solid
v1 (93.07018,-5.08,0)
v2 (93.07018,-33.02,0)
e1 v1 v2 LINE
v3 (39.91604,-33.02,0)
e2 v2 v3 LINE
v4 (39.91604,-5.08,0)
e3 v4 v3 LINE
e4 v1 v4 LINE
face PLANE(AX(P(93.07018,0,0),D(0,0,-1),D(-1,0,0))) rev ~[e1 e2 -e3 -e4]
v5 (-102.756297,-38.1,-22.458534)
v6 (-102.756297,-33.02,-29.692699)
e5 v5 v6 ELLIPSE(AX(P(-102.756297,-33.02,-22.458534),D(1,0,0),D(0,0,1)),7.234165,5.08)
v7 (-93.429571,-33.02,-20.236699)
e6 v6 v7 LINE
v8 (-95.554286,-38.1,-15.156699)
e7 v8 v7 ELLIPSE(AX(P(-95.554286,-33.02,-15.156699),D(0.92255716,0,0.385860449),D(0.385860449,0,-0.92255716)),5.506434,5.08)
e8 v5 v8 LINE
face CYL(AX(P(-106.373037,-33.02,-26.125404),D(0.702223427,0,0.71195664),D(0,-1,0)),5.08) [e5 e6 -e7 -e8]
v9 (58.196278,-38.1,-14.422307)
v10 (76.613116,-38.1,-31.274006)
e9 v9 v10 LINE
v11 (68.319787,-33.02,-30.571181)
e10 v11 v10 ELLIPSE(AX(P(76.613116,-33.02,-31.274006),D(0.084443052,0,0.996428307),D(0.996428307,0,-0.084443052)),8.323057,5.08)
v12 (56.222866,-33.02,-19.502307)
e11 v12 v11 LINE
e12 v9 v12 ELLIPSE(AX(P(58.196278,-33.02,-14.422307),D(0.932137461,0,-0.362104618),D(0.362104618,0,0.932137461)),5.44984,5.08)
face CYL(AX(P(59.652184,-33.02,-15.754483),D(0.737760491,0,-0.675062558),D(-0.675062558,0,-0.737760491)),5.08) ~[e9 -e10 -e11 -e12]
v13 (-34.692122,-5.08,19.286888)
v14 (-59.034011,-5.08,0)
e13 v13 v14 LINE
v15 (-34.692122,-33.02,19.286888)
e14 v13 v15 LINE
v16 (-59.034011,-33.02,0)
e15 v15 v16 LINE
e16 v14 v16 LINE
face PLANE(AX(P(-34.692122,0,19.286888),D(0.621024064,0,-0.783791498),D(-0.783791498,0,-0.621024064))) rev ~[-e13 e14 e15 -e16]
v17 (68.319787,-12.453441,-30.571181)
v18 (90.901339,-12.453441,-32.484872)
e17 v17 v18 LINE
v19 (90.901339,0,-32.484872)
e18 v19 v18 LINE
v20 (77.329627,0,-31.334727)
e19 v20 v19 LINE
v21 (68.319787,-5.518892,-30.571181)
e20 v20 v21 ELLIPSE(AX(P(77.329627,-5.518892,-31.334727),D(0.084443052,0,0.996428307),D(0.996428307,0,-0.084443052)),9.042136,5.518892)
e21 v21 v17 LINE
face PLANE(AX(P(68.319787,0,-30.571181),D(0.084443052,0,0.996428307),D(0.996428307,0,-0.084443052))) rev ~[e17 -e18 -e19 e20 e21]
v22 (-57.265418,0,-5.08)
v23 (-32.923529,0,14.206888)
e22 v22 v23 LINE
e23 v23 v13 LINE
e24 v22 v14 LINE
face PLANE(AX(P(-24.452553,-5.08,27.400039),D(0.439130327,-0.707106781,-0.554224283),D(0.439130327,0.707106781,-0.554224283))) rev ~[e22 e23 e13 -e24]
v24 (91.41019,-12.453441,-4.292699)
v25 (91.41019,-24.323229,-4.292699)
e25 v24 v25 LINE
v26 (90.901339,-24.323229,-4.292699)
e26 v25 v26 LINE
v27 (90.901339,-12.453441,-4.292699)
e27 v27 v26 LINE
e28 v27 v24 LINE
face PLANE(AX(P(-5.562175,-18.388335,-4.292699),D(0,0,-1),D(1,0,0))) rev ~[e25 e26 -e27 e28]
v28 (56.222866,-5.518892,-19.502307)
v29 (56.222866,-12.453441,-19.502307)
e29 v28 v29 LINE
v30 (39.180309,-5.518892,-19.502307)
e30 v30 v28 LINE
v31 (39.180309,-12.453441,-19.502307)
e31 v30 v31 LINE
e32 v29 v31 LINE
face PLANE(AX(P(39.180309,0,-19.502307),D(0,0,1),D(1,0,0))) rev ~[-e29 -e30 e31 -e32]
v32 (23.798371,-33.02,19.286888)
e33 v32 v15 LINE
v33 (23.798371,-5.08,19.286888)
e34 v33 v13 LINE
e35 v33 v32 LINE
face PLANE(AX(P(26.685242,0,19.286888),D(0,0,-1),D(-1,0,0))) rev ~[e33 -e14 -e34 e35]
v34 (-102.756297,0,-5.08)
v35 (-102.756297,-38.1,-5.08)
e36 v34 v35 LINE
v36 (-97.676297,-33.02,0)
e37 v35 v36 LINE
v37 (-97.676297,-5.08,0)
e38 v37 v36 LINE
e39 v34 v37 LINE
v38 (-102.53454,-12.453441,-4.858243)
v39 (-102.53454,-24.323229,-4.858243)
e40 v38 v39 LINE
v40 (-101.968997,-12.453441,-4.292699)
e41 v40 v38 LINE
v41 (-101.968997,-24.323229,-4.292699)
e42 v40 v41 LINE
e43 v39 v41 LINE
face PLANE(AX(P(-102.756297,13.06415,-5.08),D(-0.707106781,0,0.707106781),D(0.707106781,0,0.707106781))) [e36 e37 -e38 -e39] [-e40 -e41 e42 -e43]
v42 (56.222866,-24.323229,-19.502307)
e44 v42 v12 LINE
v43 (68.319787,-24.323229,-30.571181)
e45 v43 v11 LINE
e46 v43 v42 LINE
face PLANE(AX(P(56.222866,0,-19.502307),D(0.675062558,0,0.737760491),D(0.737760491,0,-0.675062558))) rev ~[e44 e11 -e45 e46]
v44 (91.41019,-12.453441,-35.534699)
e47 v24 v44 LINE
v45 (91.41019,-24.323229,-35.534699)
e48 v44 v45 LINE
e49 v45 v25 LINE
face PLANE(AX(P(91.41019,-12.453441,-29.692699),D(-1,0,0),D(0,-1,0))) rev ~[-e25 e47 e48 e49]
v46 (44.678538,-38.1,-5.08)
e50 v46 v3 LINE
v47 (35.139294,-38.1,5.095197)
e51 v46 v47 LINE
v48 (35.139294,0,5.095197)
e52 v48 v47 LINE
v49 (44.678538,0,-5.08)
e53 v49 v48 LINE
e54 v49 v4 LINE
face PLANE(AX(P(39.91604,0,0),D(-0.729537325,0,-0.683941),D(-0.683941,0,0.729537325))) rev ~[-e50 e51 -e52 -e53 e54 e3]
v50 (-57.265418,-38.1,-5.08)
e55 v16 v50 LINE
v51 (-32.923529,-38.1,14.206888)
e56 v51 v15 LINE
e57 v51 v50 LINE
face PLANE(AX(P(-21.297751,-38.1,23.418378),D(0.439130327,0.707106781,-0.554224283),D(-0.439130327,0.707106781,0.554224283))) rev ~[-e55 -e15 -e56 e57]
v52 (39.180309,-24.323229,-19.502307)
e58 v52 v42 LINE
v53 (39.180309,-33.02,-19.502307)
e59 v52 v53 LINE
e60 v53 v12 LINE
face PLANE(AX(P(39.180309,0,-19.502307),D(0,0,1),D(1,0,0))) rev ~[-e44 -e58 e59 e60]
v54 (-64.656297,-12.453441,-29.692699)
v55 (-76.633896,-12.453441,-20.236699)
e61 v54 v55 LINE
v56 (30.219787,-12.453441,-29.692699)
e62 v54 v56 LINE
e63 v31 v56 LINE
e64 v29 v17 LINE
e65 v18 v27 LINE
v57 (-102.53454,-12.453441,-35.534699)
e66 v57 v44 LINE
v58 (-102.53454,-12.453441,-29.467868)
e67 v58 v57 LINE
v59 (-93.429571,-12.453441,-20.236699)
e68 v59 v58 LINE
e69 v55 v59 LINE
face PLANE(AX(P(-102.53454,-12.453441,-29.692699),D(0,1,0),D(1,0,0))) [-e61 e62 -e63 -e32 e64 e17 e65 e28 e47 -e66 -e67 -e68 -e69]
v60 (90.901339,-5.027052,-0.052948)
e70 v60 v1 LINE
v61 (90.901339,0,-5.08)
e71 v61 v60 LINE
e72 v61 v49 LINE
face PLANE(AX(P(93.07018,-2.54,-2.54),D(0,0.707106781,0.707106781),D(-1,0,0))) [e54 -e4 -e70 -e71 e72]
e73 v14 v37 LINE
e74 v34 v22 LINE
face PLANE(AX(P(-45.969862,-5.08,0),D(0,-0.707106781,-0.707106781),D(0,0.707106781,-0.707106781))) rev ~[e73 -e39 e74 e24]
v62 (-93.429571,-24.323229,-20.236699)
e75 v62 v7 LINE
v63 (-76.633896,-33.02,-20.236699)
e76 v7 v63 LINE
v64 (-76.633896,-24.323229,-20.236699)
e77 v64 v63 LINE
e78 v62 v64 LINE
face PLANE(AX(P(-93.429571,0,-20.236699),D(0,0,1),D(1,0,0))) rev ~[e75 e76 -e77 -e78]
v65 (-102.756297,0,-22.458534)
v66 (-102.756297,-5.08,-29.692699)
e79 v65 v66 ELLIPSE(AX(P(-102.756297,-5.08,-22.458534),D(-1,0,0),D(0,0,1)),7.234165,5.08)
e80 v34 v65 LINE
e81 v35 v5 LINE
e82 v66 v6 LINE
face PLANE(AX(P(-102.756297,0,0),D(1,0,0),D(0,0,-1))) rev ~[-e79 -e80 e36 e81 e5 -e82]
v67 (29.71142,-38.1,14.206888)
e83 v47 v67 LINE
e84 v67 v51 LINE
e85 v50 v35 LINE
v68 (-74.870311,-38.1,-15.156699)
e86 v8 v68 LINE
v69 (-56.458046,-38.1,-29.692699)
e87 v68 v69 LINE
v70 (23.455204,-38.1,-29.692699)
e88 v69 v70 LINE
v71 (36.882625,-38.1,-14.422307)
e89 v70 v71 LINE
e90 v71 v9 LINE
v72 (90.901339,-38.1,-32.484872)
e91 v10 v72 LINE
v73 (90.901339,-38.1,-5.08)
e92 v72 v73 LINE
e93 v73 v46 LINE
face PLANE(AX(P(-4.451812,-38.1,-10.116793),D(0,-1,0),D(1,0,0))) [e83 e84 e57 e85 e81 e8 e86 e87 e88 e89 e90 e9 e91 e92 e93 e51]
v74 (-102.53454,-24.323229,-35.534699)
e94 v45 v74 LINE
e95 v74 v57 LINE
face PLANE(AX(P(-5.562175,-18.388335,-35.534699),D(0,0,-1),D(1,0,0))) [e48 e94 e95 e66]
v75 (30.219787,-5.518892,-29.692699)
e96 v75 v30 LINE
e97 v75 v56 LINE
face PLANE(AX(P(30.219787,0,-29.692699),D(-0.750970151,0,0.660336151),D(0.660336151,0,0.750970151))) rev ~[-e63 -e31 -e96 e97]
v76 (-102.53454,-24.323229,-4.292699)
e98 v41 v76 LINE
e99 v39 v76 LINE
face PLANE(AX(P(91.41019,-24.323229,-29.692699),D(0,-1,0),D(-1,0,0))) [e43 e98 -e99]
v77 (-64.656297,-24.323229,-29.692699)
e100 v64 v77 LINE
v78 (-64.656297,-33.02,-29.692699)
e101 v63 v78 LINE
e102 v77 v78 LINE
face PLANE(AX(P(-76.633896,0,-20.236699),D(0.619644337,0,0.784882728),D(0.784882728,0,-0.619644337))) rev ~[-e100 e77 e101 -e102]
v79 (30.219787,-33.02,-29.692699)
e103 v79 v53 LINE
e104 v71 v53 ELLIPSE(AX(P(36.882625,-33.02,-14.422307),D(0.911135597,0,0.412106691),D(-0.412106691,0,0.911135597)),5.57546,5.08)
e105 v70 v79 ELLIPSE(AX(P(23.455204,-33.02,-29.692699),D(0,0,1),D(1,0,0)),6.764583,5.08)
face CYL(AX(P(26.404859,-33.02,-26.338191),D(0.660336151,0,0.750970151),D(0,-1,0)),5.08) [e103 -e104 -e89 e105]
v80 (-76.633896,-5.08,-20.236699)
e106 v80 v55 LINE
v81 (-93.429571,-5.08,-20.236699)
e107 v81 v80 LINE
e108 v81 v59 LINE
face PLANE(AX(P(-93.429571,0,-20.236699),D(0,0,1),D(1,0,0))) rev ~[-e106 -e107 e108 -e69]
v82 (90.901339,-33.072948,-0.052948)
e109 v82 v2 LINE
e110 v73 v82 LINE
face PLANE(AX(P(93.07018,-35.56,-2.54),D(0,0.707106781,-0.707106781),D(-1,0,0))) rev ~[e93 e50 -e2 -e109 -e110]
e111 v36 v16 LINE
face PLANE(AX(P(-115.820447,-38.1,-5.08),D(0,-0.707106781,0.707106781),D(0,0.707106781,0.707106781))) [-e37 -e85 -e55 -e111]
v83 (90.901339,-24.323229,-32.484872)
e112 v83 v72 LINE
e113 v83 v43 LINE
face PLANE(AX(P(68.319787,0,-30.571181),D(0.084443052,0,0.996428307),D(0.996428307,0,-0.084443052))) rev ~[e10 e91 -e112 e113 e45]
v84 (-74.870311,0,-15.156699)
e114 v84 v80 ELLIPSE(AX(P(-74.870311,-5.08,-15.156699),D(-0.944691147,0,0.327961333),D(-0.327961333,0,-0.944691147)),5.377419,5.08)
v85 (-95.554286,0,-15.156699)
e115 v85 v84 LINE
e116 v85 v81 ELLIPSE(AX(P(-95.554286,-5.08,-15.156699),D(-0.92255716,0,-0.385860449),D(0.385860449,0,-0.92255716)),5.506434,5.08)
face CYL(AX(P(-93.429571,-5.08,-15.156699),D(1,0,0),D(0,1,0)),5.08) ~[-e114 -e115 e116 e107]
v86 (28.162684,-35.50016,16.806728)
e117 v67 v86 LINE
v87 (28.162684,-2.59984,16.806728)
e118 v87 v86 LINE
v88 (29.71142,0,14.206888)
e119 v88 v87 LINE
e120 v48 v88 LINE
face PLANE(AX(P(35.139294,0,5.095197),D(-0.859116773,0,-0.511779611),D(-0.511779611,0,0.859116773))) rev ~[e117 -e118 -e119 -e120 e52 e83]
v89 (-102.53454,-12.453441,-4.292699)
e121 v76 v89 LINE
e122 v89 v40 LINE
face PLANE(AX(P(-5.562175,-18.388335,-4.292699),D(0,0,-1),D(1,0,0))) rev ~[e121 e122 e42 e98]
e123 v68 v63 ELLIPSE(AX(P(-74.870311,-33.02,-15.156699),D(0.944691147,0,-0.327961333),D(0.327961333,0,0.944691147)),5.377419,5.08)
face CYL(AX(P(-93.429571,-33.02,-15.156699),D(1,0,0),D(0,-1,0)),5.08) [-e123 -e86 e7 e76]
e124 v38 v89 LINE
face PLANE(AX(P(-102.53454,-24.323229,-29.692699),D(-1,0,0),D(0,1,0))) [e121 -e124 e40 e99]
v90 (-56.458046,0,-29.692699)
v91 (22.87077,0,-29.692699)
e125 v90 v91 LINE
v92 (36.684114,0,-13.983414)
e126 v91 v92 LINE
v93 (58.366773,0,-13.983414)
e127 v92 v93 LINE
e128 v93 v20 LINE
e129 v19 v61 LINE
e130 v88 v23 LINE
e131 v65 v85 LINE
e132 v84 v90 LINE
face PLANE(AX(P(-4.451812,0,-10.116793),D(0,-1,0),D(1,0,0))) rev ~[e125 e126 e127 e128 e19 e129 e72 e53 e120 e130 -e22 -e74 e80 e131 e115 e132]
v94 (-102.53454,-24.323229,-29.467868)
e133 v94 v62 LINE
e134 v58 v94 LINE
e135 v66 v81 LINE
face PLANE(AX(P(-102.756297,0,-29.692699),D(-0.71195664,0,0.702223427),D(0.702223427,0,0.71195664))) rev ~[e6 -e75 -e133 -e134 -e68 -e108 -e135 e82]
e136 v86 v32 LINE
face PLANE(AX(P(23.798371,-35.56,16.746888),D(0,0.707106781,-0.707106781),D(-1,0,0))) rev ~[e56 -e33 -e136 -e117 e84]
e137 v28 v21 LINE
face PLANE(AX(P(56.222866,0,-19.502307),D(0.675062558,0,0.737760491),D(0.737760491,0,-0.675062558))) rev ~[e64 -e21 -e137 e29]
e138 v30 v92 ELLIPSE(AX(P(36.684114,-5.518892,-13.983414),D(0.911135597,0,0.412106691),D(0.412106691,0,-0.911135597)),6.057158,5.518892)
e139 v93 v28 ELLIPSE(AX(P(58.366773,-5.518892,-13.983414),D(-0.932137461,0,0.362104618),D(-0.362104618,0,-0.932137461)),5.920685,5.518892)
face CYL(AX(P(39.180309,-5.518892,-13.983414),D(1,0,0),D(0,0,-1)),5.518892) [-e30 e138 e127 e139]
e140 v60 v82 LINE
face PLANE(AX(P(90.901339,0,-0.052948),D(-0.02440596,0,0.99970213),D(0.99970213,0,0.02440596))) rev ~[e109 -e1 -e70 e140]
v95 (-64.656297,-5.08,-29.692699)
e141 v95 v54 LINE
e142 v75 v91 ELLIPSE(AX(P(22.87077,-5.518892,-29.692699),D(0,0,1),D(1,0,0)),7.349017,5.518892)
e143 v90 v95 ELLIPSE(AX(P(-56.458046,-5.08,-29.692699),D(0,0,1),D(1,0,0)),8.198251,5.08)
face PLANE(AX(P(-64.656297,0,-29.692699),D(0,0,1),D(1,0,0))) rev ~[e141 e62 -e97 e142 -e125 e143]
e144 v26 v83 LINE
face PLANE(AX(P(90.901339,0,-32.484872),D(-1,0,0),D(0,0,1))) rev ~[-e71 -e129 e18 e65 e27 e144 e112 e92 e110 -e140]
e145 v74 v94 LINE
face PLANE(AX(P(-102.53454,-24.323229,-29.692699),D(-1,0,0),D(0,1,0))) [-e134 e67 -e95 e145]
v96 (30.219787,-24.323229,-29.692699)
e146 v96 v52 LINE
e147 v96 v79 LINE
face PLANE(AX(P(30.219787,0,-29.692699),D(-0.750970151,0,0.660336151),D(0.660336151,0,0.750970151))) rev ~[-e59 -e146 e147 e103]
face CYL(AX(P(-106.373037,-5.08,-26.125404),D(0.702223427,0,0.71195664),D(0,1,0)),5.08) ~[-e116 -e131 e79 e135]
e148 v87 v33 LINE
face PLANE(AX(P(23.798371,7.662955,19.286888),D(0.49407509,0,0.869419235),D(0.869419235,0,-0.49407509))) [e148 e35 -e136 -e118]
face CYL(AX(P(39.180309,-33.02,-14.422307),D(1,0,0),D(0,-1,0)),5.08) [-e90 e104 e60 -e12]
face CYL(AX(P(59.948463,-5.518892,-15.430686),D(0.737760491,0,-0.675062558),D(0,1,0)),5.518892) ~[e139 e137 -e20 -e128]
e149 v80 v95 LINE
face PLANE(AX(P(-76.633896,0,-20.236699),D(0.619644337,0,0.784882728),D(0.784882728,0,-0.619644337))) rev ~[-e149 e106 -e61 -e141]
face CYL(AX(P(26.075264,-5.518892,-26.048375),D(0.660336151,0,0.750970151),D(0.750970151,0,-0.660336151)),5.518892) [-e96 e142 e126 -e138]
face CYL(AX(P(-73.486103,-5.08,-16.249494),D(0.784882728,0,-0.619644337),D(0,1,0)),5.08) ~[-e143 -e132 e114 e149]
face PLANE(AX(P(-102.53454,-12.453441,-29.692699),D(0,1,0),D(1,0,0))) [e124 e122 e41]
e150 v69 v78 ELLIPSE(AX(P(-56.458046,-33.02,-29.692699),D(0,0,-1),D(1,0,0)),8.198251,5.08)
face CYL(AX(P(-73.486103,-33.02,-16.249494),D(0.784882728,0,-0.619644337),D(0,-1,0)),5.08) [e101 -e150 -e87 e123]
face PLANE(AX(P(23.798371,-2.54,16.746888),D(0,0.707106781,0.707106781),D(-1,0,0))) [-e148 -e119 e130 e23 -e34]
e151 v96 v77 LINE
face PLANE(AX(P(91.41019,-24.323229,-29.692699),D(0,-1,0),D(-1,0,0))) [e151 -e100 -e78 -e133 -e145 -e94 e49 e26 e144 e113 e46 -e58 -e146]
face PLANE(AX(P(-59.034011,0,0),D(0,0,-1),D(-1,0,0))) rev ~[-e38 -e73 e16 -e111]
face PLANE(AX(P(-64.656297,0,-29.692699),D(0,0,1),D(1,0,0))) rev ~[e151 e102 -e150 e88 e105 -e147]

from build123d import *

# Parameters (mm, degrees)
F1_DEPTH      = 38.1
F2_T1_DEPTH   = 64.2282991577
F2_T3_DEPTH   = 53.4259096179
F2_T8_DEPTH   = 69.8505852304
F2_T13_DEPTH  = 69.8505852304
F2_T18_DEPTH  = 57.18488627
F2_T23_DEPTH  = 57.18488627
F2_T29_DEPTH  = 57.18488627
F2_T33_DEPTH  = 56.7864356516
F2_T40_DEPTH  = 56.7864356516
F2_T44_DEPTH  = 57.18488627
F3_R          = 5.5188922036
F4_R          = 5.08
F5_SIZE       = 5.08
F6_SIZE       = 5.08
F8_DEPTH      = 5.842
F8_DEPTH_BACK = 25.4


# Not quite as in the source:
# - a fillet or chamfer that OpenCascade refuses, or shapes differently, is made with other operations: its cross-section is extruded or revolved along the edge and cut away or added


with BuildPart() as f1:
    # F0 (on Front) → F1 (new body)
    with BuildSketch(Plane.XZ):
        Polygon((68.3197870099, -30.5711814668), (90.9013386944, -32.4848717284), (90.9013386944, -19.5518693537), (90.9013386944, -0.0529484335), (93.0701802755, 0), (60.7909710004, 0), (39.9160396704, 0), (35.1392942637, 5.0951969111), (26.685241969, 19.2868879506), (6.6764656577, 19.2868879506), (-19.6780025163, 19.2868879506), (-34.6921224135, 19.2868879506), (-59.0340113345, 0), (-76.2522614858, 0), (-85.7398739654, 0), (-102.7562974073, 0), (-102.7562974073, -29.6926991102), (-93.4295707114, -20.2366987188), (-86.7940447176, -20.2366987188), (-78.7120151127, -20.2366987188), (-76.6338963938, -20.2366987188), (-64.6562974073, -29.6926991102), (-40.7615778127, -29.6926991102), (-19.6780025163, -29.6926991102), (0, -29.6926991102), (14.0557177055, -29.6926991102), (30.2197870099, -29.6926991102), (39.1803090661, -19.5023065498), (56.2228657745, -19.5023065498), align=None)
    extrude(amount=F1_DEPTH)

    # F2: chamfer of 5.08 on 6 edges, made by hand

    # F2_s2 → F2_t1 (cut)
    with BuildSketch(Plane.XZ.offset(-13.0641495789)):
        Polygon((-102.7562974073, -5.08), (-97.6762974073, 0), (-102.7562974073, 0), align=None)
    extrude(amount=F2_T1_DEPTH, mode=Mode.SUBTRACT)

    # F2_s4 → F2_t3 (cut)
    with BuildSketch(Plane.XZ.offset(-7.6629548089)):
        Polygon((23.7983706465, 19.2868879506), (28.1626838525, 16.8067283763), (26.685241969, 19.2868879506), align=None)
    extrude(amount=F2_T3_DEPTH, mode=Mode.SUBTRACT)


with BuildPart() as f2_tool6:
    # F2_s7 → F2_t8 (new body)
    with BuildSketch(Plane.YZ.offset(-115.8204469861)):
        Polygon((-38.1, -5.08), (-33.02, 0), (-38.1, 0), align=None)
    extrude(amount=F2_T8_DEPTH)

    split(bisect_by=Plane(origin=(-22.7676995967, 0, 28.7350046307), x_dir=(0, 1, 0), z_dir=(-0.6210240643, 0, 0.7837914975)), keep=Keep.TOP)


with BuildPart() as f1_1:
    add(f1.part)

    # F2_t5: cut F2_tool6
    add(f2_tool6.part, mode=Mode.SUBTRACT)


with BuildPart() as f2_tool11:
    # F2_s12 → F2_t13 (new body)
    with BuildSketch(Plane.YZ.offset(-45.9698617557)):
        Polygon((-5.08, 0), (0, -5.08), (0, 0), align=None)
    extrude(amount=-F2_T13_DEPTH)

    split(bisect_by=Plane(origin=(-22.7676995967, 0, 28.7350046307), x_dir=(0, 1, 0), z_dir=(-0.6210240643, 0, 0.7837914975)), keep=Keep.TOP)


with BuildPart() as f1_2:
    add(f1_1.part)

    # F2_t10: cut F2_tool11
    add(f2_tool11.part, mode=Mode.SUBTRACT)


with BuildPart() as f2_tool16:
    # F2_s17 → F2_t18 (new body)
    with BuildSketch(Plane(origin=(-1.6848534543, 0, -1.3349654126), x_dir=(0, 1, 0), z_dir=(-0.7837914975, 0, -0.6210240643))):
        Polygon((-38.1, -31.5815416486), (-33.02, -36.6615416486), (-38.1, -36.6615416486), align=None)
    extrude(amount=F2_T18_DEPTH)

    split(bisect_by=Plane.XY, keep=Keep.TOP)


with BuildPart() as f1_3:
    add(f1_2.part)

    # F2_t15: cut F2_tool16
    add(f2_tool16.part, mode=Mode.SUBTRACT)


with BuildPart() as f2_tool21:
    # F2_s22 → F2_t23 (new body)
    with BuildSketch(Plane(origin=(-1.6848534543, 0, -1.3349654126), x_dir=(0, 1, 0), z_dir=(-0.7837914975, 0, -0.6210240643))):
        Polygon((-5.08, -36.6615416486), (0, -31.5815416486), (0, -36.6615416486), align=None)
    extrude(amount=F2_T23_DEPTH)

    split(bisect_by=Plane.XY, keep=Keep.TOP)


with BuildPart() as f1_4:
    add(f1_3.part)

    # F2_t20: cut F2_tool21
    add(f2_tool21.part, mode=Mode.SUBTRACT)


with BuildPart() as f2_tool27:
    # F2_s28 → F2_t29 (new body)
    with BuildSketch(Plane(origin=(-1.6848534543, 0, -1.3349654126), x_dir=(0, 1, 0), z_dir=(-0.7837914975, 0, -0.6210240643))):
        Polygon((-38.1, -31.5815416486), (-33.02, -36.6615416486), (-38.1, -36.6615416486), align=None)
    extrude(amount=F2_T29_DEPTH)

    split(bisect_by=Plane.XY, keep=Keep.BOTTOM)


with BuildPart() as f2_tool31:
    # F2_s32 → F2_t33 (new body)
    with BuildSketch(Plane.YZ.offset(-102.7562974073)):
        Polygon((-38.1, -5.08), (-33.02, 0), (-38.1, 0), align=None)
    extrude(amount=F2_T33_DEPTH)

    split(bisect_by=Plane(origin=(-22.7676995967, 0, 28.7350046307), x_dir=(0, 1, 0), z_dir=(0.6210240643, 0, -0.7837914975)), keep=Keep.TOP)


with BuildPart() as f2_tool27_1:
    add(f2_tool27.part)

    # F2_t35: intersect F2_tool31
    add(f2_tool31.part, mode=Mode.INTERSECT)


with BuildPart() as f1_5:
    add(f1_4.part)

    # F2_t25: cut F2_tool27
    add(f2_tool27_1.part, mode=Mode.SUBTRACT)


with BuildPart() as f2_tool38:
    # F2_s39 → F2_t40 (new body)
    with BuildSketch(Plane.YZ.offset(-45.9698617557)):
        Polygon((-5.08, 0), (0, -5.08), (0, 0), align=None)
    extrude(amount=-F2_T40_DEPTH)

    split(bisect_by=Plane(origin=(-22.7676995967, 0, 28.7350046307), x_dir=(0, 1, 0), z_dir=(0.6210240643, 0, -0.7837914975)), keep=Keep.TOP)


with BuildPart() as f2_tool42:
    # F2_s43 → F2_t44 (new body)
    with BuildSketch(Plane(origin=(-1.6848534543, 0, -1.3349654126), x_dir=(0, 1, 0), z_dir=(-0.7837914975, 0, -0.6210240643))):
        Polygon((-5.08, -36.6615416486), (0, -31.5815416486), (0, -36.6615416486), align=None)
    extrude(amount=F2_T44_DEPTH)

    split(bisect_by=Plane.XY, keep=Keep.BOTTOM)


with BuildPart() as f2_tool38_1:
    add(f2_tool38.part)

    # F2_t46: intersect F2_tool42
    add(f2_tool42.part, mode=Mode.INTERSECT)


with BuildPart() as f1_6:
    add(f1_5.part)

    # F2_t36: cut F2_tool38
    add(f2_tool38_1.part, mode=Mode.SUBTRACT)

    # F3
    f3_edges = [f1_6.edges().sort_by_distance(p)[0] for p in [
        (62.271326, 0, -25.036744),
        (47.701587, 0, -19.502307),
        (34.700048, 0, -24.597503),
    ]]
    fillet(f3_edges, radius=F3_R)

    # F4
    f4_edges = [f1_6.edges().sort_by_distance(p)[0] for p in [
        (34.700048, -38.1, -24.597503),
        (47.701587, -38.1, -19.502307),
        (62.271326, -38.1, -25.036744),
        (-70.645097, 0, -24.964699),
        (-85.031734, 0, -20.236699),
        (-98.092934, 0, -24.964699),
        (-85.031734, -38.1, -20.236699),
        (-70.645097, -38.1, -24.964699),
        (-98.092934, -38.1, -24.964699),
    ]]
    fillet(f4_edges, radius=F4_R)

    # F5
    f5_edges = [f1_6.edges().sort_by_distance(p)[0] for p in [
        (66.49311, -38.1, 0),
        (66.49311, 0, 0),
    ]]
    chamfer(f5_edges, length=F5_SIZE)

    # F6
    f6_edges = [f1_6.edges().sort_by_distance(p)[0] for p in [
        (-1.356857, 0, 19.286888),
        (-1.356857, -38.1, 19.286888),
    ]]
    chamfer(f6_edges, length=F6_SIZE)

    # F7 (on face) → F8 (join, two sides)
    with BuildSketch(Plane(origin=(0, 0, -29.6926991102), x_dir=(1, 0, 0), z_dir=(0, 0, -1))) as f8_sk:
        Polygon((-102.5345399976, 24.3232287467), (-102.5345399976, 12.4534405768), (90.11746943, 12.4534405768), (91.410189867, 12.4534405768), (91.410189867, 24.3232287467), align=None)
    extrude(amount=F8_DEPTH)
    extrude(f8_sk.sketch, amount=-F8_DEPTH_BACK)


solid = f1_6.part
